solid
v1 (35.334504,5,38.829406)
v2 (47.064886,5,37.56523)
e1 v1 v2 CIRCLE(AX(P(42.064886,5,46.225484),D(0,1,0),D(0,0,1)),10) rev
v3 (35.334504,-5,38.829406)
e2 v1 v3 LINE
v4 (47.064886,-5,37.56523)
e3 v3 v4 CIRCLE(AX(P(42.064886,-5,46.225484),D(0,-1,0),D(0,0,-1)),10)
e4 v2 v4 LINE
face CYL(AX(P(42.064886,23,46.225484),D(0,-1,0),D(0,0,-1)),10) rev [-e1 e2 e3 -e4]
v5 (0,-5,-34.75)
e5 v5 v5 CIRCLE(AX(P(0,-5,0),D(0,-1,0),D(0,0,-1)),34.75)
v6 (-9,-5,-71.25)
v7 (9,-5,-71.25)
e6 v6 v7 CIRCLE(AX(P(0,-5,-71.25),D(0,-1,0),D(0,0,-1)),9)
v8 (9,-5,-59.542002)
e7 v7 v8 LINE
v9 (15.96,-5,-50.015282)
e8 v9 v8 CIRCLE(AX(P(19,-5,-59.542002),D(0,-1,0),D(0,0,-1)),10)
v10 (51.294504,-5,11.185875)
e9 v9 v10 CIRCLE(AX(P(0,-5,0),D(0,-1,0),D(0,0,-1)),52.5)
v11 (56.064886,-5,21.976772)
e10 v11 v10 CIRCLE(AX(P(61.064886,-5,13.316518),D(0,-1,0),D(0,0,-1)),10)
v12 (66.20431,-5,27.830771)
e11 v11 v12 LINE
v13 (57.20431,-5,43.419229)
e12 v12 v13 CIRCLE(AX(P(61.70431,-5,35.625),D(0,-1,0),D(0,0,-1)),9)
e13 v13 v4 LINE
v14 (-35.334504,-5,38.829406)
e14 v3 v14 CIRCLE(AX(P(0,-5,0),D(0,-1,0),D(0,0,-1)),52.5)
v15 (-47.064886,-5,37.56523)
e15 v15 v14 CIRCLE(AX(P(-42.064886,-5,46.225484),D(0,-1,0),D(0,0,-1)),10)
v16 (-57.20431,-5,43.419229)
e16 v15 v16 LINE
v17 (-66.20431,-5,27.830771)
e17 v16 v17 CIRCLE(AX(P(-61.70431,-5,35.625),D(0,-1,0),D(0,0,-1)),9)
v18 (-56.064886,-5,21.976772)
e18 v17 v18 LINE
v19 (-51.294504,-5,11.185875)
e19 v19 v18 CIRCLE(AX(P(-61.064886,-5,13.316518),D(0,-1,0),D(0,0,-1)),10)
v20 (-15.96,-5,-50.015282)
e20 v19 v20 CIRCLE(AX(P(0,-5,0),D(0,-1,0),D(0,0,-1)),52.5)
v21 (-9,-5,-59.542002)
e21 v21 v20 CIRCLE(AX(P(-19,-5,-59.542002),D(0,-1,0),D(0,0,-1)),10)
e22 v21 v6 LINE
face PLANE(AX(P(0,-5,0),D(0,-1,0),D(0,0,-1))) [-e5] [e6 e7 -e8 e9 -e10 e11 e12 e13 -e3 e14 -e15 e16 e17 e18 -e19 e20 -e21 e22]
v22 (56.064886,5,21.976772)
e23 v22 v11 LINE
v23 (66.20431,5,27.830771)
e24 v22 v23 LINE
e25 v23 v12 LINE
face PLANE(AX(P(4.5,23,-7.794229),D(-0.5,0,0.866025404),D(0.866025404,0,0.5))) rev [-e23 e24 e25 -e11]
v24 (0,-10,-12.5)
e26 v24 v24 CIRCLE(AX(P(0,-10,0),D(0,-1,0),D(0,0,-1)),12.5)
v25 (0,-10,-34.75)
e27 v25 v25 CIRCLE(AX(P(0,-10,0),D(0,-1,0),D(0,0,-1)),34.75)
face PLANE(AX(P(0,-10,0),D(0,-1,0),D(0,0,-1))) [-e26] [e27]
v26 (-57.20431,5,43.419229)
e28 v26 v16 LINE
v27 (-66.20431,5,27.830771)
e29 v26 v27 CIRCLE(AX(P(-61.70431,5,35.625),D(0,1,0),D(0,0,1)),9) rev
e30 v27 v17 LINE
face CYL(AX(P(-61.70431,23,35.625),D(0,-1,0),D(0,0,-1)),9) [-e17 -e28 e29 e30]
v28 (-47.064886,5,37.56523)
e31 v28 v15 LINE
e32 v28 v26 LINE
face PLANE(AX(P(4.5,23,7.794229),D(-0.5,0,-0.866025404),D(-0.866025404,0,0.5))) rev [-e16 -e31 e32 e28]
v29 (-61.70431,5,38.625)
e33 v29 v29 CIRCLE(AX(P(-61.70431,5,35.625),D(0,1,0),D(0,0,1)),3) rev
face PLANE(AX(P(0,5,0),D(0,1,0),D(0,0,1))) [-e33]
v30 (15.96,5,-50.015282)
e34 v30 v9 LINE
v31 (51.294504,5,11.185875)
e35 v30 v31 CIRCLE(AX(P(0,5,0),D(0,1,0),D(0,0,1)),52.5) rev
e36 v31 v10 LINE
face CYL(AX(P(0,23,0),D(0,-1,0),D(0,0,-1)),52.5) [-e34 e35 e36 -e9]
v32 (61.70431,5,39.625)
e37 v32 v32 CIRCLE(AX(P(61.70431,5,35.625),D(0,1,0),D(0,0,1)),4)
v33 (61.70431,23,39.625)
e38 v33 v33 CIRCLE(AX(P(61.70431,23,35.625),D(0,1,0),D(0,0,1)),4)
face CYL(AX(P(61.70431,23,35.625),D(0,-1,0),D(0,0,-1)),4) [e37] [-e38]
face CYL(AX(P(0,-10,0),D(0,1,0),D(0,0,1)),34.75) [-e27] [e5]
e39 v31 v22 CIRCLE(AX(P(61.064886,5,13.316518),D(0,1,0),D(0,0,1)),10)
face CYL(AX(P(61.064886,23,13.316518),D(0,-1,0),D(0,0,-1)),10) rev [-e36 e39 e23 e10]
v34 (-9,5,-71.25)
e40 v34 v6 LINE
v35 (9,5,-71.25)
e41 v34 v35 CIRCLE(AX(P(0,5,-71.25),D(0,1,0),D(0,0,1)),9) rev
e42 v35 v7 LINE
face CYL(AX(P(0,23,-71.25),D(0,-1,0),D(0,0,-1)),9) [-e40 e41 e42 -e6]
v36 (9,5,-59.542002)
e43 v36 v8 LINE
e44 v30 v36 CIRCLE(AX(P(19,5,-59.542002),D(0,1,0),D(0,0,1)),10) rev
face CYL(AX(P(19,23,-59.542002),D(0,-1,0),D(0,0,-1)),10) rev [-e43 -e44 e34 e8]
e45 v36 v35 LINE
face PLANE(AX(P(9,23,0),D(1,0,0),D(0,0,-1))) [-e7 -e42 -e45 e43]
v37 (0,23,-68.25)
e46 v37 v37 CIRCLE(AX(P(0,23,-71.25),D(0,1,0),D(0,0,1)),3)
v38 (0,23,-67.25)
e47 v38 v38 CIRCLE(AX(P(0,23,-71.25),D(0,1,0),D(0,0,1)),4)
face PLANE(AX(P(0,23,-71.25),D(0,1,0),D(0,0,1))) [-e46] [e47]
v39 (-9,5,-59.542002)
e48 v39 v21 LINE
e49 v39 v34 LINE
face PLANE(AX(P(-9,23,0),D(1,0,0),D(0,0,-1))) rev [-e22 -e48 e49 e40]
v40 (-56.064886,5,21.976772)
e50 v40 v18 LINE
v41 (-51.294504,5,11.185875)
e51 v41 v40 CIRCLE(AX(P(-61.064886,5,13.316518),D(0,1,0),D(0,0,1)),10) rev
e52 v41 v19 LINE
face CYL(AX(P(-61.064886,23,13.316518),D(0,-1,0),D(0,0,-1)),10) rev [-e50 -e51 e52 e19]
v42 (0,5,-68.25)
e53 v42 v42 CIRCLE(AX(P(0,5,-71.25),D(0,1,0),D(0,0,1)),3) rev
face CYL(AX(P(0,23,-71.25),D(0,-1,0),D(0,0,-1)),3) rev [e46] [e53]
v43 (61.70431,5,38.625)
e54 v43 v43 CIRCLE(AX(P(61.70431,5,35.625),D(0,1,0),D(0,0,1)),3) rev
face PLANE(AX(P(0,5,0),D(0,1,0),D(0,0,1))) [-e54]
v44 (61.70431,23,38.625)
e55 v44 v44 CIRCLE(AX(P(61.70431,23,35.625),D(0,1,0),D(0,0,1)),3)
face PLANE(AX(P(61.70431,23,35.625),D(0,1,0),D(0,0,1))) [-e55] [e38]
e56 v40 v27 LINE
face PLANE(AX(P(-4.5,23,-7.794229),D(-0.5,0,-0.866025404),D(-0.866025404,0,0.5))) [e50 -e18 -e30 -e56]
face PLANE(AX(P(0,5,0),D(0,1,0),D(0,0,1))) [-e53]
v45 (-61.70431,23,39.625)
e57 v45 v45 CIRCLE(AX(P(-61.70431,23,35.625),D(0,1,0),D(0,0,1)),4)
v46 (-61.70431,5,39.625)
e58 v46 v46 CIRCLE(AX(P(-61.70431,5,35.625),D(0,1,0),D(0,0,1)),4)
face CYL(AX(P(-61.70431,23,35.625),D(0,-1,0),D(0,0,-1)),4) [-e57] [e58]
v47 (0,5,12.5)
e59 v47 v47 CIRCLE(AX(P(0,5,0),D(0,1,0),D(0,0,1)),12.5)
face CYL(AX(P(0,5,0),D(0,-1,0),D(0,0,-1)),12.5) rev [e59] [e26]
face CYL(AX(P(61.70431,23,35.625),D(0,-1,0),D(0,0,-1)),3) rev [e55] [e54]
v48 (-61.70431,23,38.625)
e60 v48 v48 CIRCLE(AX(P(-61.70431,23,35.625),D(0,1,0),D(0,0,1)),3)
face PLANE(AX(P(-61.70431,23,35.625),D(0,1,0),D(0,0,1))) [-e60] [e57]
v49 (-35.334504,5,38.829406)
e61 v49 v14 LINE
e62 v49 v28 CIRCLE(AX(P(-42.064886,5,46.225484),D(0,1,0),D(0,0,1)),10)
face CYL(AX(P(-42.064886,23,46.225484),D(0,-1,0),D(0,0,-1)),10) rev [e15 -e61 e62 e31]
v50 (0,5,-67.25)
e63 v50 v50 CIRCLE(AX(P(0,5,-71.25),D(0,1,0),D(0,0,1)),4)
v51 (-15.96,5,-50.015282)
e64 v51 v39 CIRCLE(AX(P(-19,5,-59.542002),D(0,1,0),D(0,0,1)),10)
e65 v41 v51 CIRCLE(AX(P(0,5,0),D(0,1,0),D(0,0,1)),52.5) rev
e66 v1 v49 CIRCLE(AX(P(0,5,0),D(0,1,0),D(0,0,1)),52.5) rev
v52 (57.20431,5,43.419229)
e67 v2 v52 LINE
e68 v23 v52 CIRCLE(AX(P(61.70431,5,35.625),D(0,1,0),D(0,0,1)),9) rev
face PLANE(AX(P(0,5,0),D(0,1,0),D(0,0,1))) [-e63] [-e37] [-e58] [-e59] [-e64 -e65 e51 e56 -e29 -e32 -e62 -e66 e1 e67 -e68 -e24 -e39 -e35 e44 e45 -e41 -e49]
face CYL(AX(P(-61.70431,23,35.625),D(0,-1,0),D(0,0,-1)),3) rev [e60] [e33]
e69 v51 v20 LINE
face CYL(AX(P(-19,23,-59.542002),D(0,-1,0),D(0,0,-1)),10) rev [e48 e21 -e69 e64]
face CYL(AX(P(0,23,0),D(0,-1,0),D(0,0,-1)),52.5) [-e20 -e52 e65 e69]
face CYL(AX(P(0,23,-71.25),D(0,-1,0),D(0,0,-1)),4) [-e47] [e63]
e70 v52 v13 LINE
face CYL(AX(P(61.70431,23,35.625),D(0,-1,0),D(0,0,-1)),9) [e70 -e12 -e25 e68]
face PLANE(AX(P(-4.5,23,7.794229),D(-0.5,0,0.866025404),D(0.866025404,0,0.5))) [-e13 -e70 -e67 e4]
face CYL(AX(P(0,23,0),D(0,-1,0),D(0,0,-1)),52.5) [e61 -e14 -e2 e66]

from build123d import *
from build123d.topology import SkipClean

# Parameters (mm, degrees)
SKETCH_1_R               = 82.5
SKETCH_1_R_2             = 12.5
EXTRUDE_1_DEPTH          = 5
SKETCH_2_R               = 4
SKETCH_2_R_2             = 3
EXTRUDE_2_DEPTH          = 18
EXTRUDE_START            = 5
SKETCH_3_R               = 35
SKETCH_3_R_2             = 12.5
EXTRUDE_3_DEPTH          = 5
CUT_EXTRUDE_1_DEPTH      = 119.05295422
CUT_EXTRUDE_1_DEPTH_BACK = 10
SKETCH_4_R               = 82.5
EXTRUDE_4_DEPTH          = 5
SKETCH_6_R               = 12.5
CUT_EXTRUDE_2_DEPTH      = 110.399094856
SKETCH_7_R               = 34.75
SKETCH_7_R_2             = 12.5
EXTRUDE_5_DEPTH          = 5


with BuildPart() as part:
    # 草圖1 → 填料-伸長1 (new body)
    with BuildSketch(Plane(origin=(0, 0, 0), x_dir=(1, 0, 0), z_dir=(0, 1, 0))):
        with Locations(Location((0, 0, 0), (0, 0, 270))):
            Circle(SKETCH_1_R)
        with Locations(Location((0, 0, 0), (0, 0, 270))):
            Circle(SKETCH_1_R_2, mode=Mode.SUBTRACT)
    extrude(amount=EXTRUDE_1_DEPTH)

    # 草圖2 → 填料-伸長2 (add)
    # profile 1 of 3: a face of its own
    with BuildSketch(Plane(origin=(0, 5, 0), x_dir=(1, 0, 0), z_dir=(0, 1, 0))):
        with Locations(Location((0, 71.25, 0), (0, 0, 270))):
            Circle(SKETCH_2_R)
        with Locations(Location((0, 71.25, 0), (0, 0, 270))):
            Circle(SKETCH_2_R_2, mode=Mode.SUBTRACT)
    # profile 2 of 3: a face of its own
    with BuildSketch(Plane(origin=(0, 5, 0), x_dir=(1, 0, 0), z_dir=(0, 1, 0))):
        with Locations(Location((61.70431002, -35.625, 0), (0, 0, 270))):
            Circle(SKETCH_2_R)
        with Locations(Location((61.70431002, -35.625, 0), (0, 0, 270))):
            Circle(SKETCH_2_R_2, mode=Mode.SUBTRACT)
    # profile 3 of 3: a face of its own
    with BuildSketch(Plane(origin=(0, 5, 0), x_dir=(1, 0, 0), z_dir=(0, 1, 0))):
        with Locations(Location((-61.70431002, -35.625, 0), (0, 0, 270))):
            Circle(SKETCH_2_R)
        with Locations(Location((-61.70431002, -35.625, 0), (0, 0, 270))):
            Circle(SKETCH_2_R_2, mode=Mode.SUBTRACT)
    extrude(amount=EXTRUDE_2_DEPTH)

    # 草圖3 → 填料-伸長3 (add)
    with SkipClean():  # the faces are left unmerged after this step: merging them gives an invalid solid
        with BuildSketch(Plane.XZ.offset(EXTRUDE_START)):
            with Locations(Location((0, 0, 0), (0, 0, 90))):
                Circle(SKETCH_3_R)
            with Locations(Location((0, 0, 0), (0, 0, 270))):
                Circle(SKETCH_3_R_2, mode=Mode.SUBTRACT)
        extrude(amount=-EXTRUDE_3_DEPTH)

    # 草圖4 → 除料-伸長1 (cut, two sides: drawn at the far end of the back side and taken through both)
    with SkipClean():  # the faces are left unmerged after this step: merging them gives an invalid solid
        with BuildSketch(Plane(origin=(0, 5, 0), x_dir=(1, 0, 0), z_dir=(0, 1, 0)).offset(-CUT_EXTRUDE_1_DEPTH_BACK)):
            Circle(SKETCH_4_R)
            with BuildLine():
                ThreePointArc((-35.334504499, -38.829406277), (0, -52.5), (35.334504499, -38.829406277))
                ThreePointArc((35.334504499, -38.829406277), (40.993396246, -36.283053927), (47.064886308, -37.565229625))
                Line((47.064886308, -37.565229625), (57.20431002, -43.419228634))
                ThreePointArc((57.20431002, -43.419228634), (69.498538654, -40.125), (66.20431002, -27.830771366))
                Line((66.20431002, -27.830771366), (56.064886308, -21.976772357))
                ThreePointArc((56.064886308, -21.976772357), (51.918744551, -17.359795573), (51.294504499, -11.185875388))
                ThreePointArc((51.294504499, -11.185875388), (45.466333699, 26.25), (15.96, 50.015281665))
                ThreePointArc((15.96, 50.015281665), (10.925348305, 53.6428495), (9, 59.542001982))
                Line((9, 59.542001982), (9, 71.25))
                ThreePointArc((9, 71.25), (0, 80.25), (-9, 71.25))
                Line((-9, 71.25), (-9, 59.542001982))
                ThreePointArc((-9, 59.542001982), (-10.925348305, 53.6428495), (-15.96, 50.015281665))
                ThreePointArc((-15.96, 50.015281665), (-45.466333699, 26.25), (-51.294504499, -11.185875388))
                ThreePointArc((-51.294504499, -11.185875388), (-51.918744551, -17.359795573), (-56.064886308, -21.976772357))
                Line((-56.064886308, -21.976772357), (-66.20431002, -27.830771366))
                ThreePointArc((-66.20431002, -27.830771366), (-69.498538654, -40.125), (-57.20431002, -43.419228634))
                Line((-57.20431002, -43.419228634), (-47.064886308, -37.565229625))
                ThreePointArc((-47.064886308, -37.565229625), (-40.993396246, -36.283053927), (-35.334504499, -38.829406277))
            make_face(mode=Mode.SUBTRACT)
        extrude(amount=CUT_EXTRUDE_1_DEPTH + CUT_EXTRUDE_1_DEPTH_BACK, mode=Mode.SUBTRACT)

    # 草圖5 → 填料-伸長4 (add)
    with BuildSketch(Plane.XZ):
        with BuildLine():
            Line((-47.064886308, 37.565229625), (-57.20431002, 43.419228634))
            ThreePointArc((-57.20431002, 43.419228634), (-69.498538654, 40.125), (-66.20431002, 27.830771366))
            Line((-66.20431002, 27.830771366), (-56.064886308, 21.976772357))
            ThreePointArc((-56.064886308, 21.976772357), (-51.918744551, 17.359795573), (-51.294504499, 11.185875388))
            ThreePointArc((-51.294504499, 11.185875388), (-45.466333699, -26.25), (-15.96, -50.015281665))
            ThreePointArc((-15.96, -50.015281665), (-10.925348305, -53.6428495), (-9, -59.542001982))
            Line((-9, -59.542001982), (-9, -71.25))
            ThreePointArc((-9, -71.25), (0, -80.25), (9, -71.25))
            Line((9, -71.25), (9, -59.542001982))
            ThreePointArc((9, -59.542001982), (10.925348305, -53.6428495), (15.96, -50.015281665))
            ThreePointArc((15.96, -50.015281665), (45.466333699, -26.25), (51.294504499, 11.185875388))
            ThreePointArc((51.294504499, 11.185875388), (51.918744551, 17.359795573), (56.064886308, 21.976772357))
            Line((56.064886308, 21.976772357), (66.20431002, 27.830771366))
            ThreePointArc((66.20431002, 27.830771366), (69.498538654, 40.125), (57.20431002, 43.419228634))
            Line((57.20431002, 43.419228634), (47.064886308, 37.565229625))
            ThreePointArc((47.064886308, 37.565229625), (40.993396246, 36.283053927), (35.334504499, 38.829406277))
            ThreePointArc((35.334504499, 38.829406277), (0, 52.5), (-35.334504499, 38.829406277))
            ThreePointArc((-35.334504499, 38.829406277), (-40.993396246, 36.283053927), (-47.064886308, 37.565229625))
        make_face()
    extrude(amount=EXTRUDE_4_DEPTH)

    # 草圖6 → 除料-伸長2 (cut, through all)
    with BuildSketch(Plane(origin=(0, 0, 0), x_dir=(1, 0, 0), z_dir=(0, 1, 0))):
        with Locations(Location((0, 0, 0), (0, 0, 270))):
            Circle(SKETCH_6_R)
    extrude(amount=-CUT_EXTRUDE_2_DEPTH, mode=Mode.SUBTRACT)

    # 草圖7 → 填料-伸長5 (add)
    with SkipClean():  # the faces are left unmerged after this step: merging them gives an invalid solid
        with BuildSketch(Plane.XZ.offset(5)):
            with Locations(Location((0, 0, 0), (0, 0, 270))):
                Circle(SKETCH_7_R)
            with Locations(Location((0, 0, 0), (0, 0, 270))):
                Circle(SKETCH_7_R_2, mode=Mode.SUBTRACT)
        extrude(amount=EXTRUDE_5_DEPTH)
    add(part.part.scale(1), mode=Mode.REPLACE)  # the faces are merged on a copy


solid = part.part
